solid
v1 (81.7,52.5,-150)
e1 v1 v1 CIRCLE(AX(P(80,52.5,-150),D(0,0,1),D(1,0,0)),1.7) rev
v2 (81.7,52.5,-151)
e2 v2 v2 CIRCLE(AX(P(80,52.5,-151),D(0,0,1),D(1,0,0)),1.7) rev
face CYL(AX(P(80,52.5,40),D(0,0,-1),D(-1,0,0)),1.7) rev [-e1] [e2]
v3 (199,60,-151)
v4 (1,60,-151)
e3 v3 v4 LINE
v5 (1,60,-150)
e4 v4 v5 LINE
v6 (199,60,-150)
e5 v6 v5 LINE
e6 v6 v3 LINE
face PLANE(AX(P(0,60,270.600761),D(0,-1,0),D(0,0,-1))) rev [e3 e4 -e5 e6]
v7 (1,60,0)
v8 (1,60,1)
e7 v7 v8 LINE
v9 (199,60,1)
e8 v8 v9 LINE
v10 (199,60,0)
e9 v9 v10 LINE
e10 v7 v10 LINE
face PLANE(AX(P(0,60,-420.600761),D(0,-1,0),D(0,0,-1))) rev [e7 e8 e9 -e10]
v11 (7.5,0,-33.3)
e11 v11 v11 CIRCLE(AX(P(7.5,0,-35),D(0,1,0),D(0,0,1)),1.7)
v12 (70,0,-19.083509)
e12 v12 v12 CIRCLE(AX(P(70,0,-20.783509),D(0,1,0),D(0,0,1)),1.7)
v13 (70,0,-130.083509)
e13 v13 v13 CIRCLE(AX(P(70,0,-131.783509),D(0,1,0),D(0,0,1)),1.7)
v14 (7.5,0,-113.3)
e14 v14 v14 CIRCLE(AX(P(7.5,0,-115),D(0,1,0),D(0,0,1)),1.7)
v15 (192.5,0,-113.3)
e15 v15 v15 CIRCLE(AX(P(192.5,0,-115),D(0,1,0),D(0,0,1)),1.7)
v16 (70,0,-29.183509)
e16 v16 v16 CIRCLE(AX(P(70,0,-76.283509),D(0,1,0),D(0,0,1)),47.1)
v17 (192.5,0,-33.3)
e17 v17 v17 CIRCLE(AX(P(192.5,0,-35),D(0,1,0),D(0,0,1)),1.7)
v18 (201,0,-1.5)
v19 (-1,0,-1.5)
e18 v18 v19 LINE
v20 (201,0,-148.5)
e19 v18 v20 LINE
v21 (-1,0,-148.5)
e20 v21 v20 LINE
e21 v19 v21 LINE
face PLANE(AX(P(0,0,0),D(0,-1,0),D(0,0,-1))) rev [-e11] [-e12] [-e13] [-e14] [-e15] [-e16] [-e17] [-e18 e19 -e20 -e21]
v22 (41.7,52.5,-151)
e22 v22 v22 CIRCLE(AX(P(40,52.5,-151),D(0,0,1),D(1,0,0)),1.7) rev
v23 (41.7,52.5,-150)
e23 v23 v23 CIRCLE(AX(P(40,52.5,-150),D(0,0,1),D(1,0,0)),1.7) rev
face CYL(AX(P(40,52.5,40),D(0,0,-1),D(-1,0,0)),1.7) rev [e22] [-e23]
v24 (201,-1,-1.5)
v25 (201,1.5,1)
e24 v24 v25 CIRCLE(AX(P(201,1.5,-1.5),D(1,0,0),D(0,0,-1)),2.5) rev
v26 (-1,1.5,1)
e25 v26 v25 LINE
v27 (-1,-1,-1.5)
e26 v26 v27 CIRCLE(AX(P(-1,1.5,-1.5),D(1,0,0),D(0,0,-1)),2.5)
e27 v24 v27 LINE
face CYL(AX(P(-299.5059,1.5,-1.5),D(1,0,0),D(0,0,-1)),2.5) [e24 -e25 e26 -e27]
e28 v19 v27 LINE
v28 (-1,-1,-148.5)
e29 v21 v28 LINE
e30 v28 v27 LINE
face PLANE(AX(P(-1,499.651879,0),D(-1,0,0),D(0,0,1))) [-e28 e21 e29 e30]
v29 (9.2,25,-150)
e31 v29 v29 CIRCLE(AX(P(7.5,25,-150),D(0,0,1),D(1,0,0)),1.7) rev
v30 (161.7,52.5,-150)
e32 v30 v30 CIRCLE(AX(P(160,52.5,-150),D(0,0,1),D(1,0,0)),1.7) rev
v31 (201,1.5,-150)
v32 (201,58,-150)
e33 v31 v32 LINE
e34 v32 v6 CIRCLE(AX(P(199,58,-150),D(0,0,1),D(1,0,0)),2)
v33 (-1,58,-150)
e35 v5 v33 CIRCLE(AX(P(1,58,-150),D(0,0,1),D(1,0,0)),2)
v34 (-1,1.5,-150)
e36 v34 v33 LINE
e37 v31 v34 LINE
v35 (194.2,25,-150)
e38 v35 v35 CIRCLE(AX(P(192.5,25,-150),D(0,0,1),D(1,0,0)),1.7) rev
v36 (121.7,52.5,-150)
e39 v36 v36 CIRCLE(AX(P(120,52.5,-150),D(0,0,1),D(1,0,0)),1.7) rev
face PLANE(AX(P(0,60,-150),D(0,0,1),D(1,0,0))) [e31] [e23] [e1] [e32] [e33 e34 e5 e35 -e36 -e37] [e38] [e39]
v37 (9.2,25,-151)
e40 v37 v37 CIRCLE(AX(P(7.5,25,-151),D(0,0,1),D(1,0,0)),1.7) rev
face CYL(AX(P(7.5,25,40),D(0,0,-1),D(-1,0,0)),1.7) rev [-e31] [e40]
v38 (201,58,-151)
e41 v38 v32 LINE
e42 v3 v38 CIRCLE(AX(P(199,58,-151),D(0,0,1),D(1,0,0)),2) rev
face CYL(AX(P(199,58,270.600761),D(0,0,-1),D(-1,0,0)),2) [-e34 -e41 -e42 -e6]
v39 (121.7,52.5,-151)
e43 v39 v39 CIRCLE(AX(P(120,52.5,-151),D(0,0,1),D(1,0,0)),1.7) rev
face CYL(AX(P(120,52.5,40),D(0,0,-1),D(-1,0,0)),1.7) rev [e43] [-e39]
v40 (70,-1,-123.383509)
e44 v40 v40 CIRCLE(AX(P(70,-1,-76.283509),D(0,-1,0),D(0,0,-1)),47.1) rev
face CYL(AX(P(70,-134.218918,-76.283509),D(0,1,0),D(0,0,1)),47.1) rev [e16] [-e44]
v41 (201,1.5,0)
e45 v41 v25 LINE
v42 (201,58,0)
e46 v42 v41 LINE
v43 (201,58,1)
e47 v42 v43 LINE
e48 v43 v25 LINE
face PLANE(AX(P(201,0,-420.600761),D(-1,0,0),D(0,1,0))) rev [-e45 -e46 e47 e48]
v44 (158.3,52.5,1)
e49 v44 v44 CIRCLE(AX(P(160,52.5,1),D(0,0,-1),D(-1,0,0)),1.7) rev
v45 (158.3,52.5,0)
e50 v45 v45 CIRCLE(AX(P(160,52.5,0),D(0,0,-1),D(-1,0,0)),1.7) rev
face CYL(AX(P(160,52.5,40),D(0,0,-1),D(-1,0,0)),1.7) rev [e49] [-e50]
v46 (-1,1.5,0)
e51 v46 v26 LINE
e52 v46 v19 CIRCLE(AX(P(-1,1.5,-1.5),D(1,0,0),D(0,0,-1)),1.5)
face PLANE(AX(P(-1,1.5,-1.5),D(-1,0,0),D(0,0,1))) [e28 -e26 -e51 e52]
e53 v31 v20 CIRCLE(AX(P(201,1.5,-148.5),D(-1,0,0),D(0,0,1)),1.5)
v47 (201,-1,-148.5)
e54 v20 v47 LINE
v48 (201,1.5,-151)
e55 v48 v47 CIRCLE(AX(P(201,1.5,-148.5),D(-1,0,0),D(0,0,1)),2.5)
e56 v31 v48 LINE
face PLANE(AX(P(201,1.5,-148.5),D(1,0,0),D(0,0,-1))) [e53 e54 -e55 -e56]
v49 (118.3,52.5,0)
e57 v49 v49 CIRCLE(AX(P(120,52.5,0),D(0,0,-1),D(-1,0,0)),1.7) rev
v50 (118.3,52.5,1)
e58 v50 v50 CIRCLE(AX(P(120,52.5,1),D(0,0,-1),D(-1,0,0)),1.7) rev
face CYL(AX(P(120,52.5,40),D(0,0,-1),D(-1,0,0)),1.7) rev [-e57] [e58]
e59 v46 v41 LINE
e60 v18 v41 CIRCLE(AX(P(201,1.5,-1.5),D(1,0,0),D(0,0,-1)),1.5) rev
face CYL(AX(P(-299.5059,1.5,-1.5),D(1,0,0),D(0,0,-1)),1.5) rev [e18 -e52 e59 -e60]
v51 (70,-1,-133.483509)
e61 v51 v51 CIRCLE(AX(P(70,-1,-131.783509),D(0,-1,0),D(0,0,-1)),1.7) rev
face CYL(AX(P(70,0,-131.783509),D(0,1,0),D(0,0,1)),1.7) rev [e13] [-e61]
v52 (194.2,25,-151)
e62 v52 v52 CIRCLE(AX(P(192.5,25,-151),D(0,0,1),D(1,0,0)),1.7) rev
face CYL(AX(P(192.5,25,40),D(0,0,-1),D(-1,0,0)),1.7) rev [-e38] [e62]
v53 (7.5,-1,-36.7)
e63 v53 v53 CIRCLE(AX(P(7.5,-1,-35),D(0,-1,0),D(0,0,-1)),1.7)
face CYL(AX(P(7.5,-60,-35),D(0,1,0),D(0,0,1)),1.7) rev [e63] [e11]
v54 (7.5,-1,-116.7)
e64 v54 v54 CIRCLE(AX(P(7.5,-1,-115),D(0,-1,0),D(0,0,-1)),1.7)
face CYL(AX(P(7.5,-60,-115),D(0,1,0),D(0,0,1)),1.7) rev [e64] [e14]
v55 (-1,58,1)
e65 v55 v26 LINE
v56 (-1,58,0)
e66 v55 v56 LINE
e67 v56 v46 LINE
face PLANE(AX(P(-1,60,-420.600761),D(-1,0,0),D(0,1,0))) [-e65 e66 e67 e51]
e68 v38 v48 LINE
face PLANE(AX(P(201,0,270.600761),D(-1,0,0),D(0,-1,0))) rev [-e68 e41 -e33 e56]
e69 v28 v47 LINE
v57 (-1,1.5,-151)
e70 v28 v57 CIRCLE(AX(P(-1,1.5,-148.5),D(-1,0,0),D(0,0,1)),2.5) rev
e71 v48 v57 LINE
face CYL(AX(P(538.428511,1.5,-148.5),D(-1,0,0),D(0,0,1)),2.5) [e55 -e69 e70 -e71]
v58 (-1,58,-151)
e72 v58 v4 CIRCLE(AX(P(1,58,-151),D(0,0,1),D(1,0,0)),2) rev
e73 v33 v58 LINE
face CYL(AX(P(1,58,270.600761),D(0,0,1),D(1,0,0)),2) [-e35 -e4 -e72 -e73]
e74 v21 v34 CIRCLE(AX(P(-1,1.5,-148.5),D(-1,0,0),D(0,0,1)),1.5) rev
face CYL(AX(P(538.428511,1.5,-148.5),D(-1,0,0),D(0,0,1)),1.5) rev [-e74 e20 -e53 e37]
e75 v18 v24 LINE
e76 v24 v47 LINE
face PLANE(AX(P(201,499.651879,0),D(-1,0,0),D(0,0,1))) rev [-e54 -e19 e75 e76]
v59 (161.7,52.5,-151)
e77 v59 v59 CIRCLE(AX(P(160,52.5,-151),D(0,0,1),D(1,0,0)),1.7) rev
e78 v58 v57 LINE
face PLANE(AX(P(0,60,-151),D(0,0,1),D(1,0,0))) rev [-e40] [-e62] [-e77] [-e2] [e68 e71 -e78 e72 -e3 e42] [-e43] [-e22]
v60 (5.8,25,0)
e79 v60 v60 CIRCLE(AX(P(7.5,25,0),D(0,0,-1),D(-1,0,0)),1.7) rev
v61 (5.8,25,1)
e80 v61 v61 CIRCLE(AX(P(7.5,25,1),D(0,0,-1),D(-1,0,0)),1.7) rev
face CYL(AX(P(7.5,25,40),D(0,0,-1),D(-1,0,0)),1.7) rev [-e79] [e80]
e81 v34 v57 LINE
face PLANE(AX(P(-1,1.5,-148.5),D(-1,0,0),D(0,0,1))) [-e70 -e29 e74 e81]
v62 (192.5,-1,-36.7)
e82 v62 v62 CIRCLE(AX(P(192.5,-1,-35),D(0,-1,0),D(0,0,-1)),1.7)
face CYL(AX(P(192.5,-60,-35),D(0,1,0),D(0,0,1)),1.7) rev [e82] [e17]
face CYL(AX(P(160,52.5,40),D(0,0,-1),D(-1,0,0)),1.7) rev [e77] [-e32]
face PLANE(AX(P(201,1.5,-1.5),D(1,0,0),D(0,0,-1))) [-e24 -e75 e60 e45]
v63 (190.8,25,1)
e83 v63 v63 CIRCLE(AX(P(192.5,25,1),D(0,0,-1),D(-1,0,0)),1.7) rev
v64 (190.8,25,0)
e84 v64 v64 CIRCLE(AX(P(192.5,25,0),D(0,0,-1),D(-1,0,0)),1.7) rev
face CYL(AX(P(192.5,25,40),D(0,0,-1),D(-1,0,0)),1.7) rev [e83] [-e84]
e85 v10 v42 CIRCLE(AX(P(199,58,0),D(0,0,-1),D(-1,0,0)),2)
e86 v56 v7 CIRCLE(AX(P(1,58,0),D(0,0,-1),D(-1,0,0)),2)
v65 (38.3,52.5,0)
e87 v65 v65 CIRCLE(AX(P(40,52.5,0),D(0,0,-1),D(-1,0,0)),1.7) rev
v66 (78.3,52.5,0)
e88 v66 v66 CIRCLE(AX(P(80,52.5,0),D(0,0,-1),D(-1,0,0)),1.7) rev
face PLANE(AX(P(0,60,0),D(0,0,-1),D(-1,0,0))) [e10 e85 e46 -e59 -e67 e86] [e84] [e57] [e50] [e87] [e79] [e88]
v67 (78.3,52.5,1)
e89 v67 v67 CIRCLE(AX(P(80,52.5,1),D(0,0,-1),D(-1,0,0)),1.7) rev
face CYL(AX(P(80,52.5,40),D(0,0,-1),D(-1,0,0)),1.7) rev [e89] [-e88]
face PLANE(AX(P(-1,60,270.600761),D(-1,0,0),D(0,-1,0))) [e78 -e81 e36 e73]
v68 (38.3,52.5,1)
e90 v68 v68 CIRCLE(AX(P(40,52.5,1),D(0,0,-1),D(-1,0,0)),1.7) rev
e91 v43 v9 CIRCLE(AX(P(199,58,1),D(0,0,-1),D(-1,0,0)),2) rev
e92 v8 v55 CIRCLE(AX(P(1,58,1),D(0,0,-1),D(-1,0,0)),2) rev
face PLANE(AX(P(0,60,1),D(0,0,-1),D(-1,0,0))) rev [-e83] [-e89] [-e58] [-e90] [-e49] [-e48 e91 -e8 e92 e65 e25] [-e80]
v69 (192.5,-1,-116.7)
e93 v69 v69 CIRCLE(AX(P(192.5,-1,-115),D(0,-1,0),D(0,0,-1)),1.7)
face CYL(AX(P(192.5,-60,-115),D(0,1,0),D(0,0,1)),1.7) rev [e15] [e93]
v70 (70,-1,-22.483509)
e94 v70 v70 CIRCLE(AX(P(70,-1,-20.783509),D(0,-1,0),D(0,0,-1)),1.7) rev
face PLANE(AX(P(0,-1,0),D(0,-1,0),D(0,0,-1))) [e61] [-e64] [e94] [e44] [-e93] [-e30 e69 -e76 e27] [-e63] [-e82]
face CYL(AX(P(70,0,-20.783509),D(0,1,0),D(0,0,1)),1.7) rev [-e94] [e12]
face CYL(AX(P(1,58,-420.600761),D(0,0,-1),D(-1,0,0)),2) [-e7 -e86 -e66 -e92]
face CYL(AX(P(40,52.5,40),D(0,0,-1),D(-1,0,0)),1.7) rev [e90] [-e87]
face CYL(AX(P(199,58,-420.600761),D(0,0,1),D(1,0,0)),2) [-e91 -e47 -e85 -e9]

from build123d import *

# Parameters (mm, degrees)
CROQUIS1_W                      = 200
CROQUIS1_H                      = 150
SALIENTE_EXTRUIR1_DEPTH         = 60
VACIADO1_T                      = 1
CROQUIS3_R                      = 1.7
CORTAR_EXTRUIR2_DEPTH           = 60
CORTAR_EXTRUIR3_DEPTH           = 190
CORTAR_EXTRUIR3_DEPTH_BACK      = 104
CROQUIS4_R                      = 1.7
CORTAR_EXTRUIR4_DEPTH           = 1
TALADRO_DE_MARGEN_PARA_M31_D    = 3.4
CROQUIS14_W                     = 150
CROQUIS14_H                     = 60
CORTAR_EXTRUIR5_DEPTH           = 210
DESPLEGAR_PLIEGUES2_OUTLINE_W   = 202
DESPLEGAR_PLIEGUES2_OUTLINE_H   = 1
DESPLEGAR_PLIEGUES2_DEPTH       = 60
DESPLEGAR_START                 = -1
DESPLEGAR_PLIEGUES2_2_OUTLINE_W = 202
DESPLEGAR_PLIEGUES2_2_OUTLINE_H = 59.141592654
DESPLEGAR_PLIEGUES2_2_OUTLINE_R = 1.7
DESPLEGAR_PLIEGUES2_2_DEPTH     = 1
PROCESAR_START                  = -210.141592654
PROCESAR_PLIEGUES2_OUTLINE_W    = 202
PROCESAR_PLIEGUES2_OUTLINE_H    = 1
PROCESAR_PLIEGUES2_DEPTH        = 59.398442654
PROCESAR_START_2                = 0.74315
PROCESAR_PLIEGUES2_2_OUTLINE_W  = 202
PROCESAR_PLIEGUES2_2_OUTLINE_H  = 1
PROCESAR_PLIEGUES2_2_DEPTH      = 59.398442654
PROCESAR_START_3                = -151
PROCESAR_PLIEGUES2_3_OUTLINE_W  = 202
PROCESAR_PLIEGUES2_3_OUTLINE_H  = 60
PROCESAR_PLIEGUES2_3_OUTLINE_R  = 1.7
PROCESAR_PLIEGUES2_3_DEPTH      = 2.5
PROCESAR_START_4                = -1.5
PROCESAR_PLIEGUES2_4_OUTLINE_W  = 202
PROCESAR_PLIEGUES2_4_OUTLINE_H  = 60
PROCESAR_PLIEGUES2_4_OUTLINE_R  = 1.7
PROCESAR_PLIEGUES2_4_DEPTH      = 2.5
PROCESAR_START_5                = -1
PROCESAR_PLIEGUES2_5_DEPTH      = 202
REDONDEO1_R                     = 2


with BuildPart() as part:
    # Croquis1 → Saliente-Extruir1 (new body)
    with BuildSketch(Plane(origin=(0, 0, 0), x_dir=(1, 0, 0), z_dir=(0, 1, 0))):
        with Locations((100, 75)):
            Rectangle(CROQUIS1_W, CROQUIS1_H)
    extrude(amount=SALIENTE_EXTRUIR1_DEPTH)

    # Vaciado1
    vaciado1_openings = [part.faces().sort_by_distance(p)[0] for p in [
        (100, 60, -75),
    ]]
    offset(amount=VACIADO1_T, openings=vaciado1_openings, kind=Kind.INTERSECTION)

    # Croquis3 → Cortar-Extruir2 (cut)
    with BuildSketch(Plane(origin=(0, 0, 0), x_dir=(-1, 0, 0), z_dir=(0, 1, 0))):
        with Locations(Location((-192.5, -35, 0), (0, 0, 90))):
            Circle(CROQUIS3_R)
        with Locations(Location((-192.5, -115, 0), (0, 0, 90))):
            Circle(CROQUIS3_R)
        with Locations(Location((-7.5, -35, 0), (0, 0, 90))):
            Circle(CROQUIS3_R)
        with Locations(Location((-7.5, -115, 0), (0, 0, 90))):
            Circle(CROQUIS3_R)
    extrude(amount=-CORTAR_EXTRUIR2_DEPTH, mode=Mode.SUBTRACT)

    # Croquis4 → Cortar-Extruir3 (cut, two sides: drawn at the far end of the back side and taken through both)
    with BuildSketch(Plane.XY.offset(-150).offset(-CORTAR_EXTRUIR3_DEPTH_BACK)):
        with Locations((192.5, 25)):
            Circle(CROQUIS4_R)
        with Locations((160, 52.5)):
            Circle(CROQUIS4_R)
        with Locations((120, 52.5)):
            Circle(CROQUIS4_R)
        with Locations((80, 52.5)):
            Circle(CROQUIS4_R)
        with Locations((40, 52.5)):
            Circle(CROQUIS4_R)
        with Locations((7.5, 25)):
            Circle(CROQUIS4_R)
    extrude(amount=CORTAR_EXTRUIR3_DEPTH + CORTAR_EXTRUIR3_DEPTH_BACK, mode=Mode.SUBTRACT)

    # Croquis5 → Cortar-Extruir4 (cut)
    with BuildSketch(Plane(origin=(0, 0, 0), x_dir=(1, 0, 0), z_dir=(0, 1, 0))):
        with BuildLine():
            ThreePointArc((117.1, 76.283509089), (103.304729394, 109.588238483), (70, 123.383509089))
            Line((70, 123.383509089), (70, 29.183509089))
            ThreePointArc((70, 29.183509089), (103.304729394, 42.978779695), (117.1, 76.283509089))
        make_face()
        with BuildLine():
            Line((70, 29.183509089), (70, 123.383509089))
            ThreePointArc((70, 123.383509089), (22.9, 76.283509089), (70, 29.183509089))
        make_face()
    extrude(amount=-CORTAR_EXTRUIR4_DEPTH, mode=Mode.SUBTRACT)

    # Taladro de margen para M31 (through all)
    with Locations(Plane(origin=(0, 0, 0), x_dir=(1, 0, 0), z_dir=(0, 1, 0))):
        with Locations((70, 20.783509089), (70, 131.783509089)):
            Hole(TALADRO_DE_MARGEN_PARA_M31_D / 2)

    # Croquis14 → Cortar-Extruir5 (cut)
    with BuildSketch(Plane(origin=(201, 0, 0), x_dir=(0, 0, -1), z_dir=(1, 0, 0))):
        with Locations((75, 30)):
            Rectangle(CROQUIS14_W, CROQUIS14_H)
    extrude(amount=-CORTAR_EXTRUIR5_DEPTH, mode=Mode.SUBTRACT)

    # Desplegar pliegues2: read off the stored shape, not the designer's step
    # Desplegar pliegues2 outline → Desplegar pliegues2 (cut)
    with BuildSketch(Plane(origin=(0, 0, 0), x_dir=(1, 0, 0), z_dir=(0, 1, 0))):
        with Locations((100, 150.5)):
            Rectangle(DESPLEGAR_PLIEGUES2_OUTLINE_W, DESPLEGAR_PLIEGUES2_OUTLINE_H)
        with Locations((100, -0.5)):
            Rectangle(DESPLEGAR_PLIEGUES2_OUTLINE_W, DESPLEGAR_PLIEGUES2_OUTLINE_H)
    extrude(amount=DESPLEGAR_PLIEGUES2_DEPTH, mode=Mode.SUBTRACT)

    # Desplegar pliegues2 2 outline → Desplegar pliegues2 2 (add)
    # profile 1 of 2: a face of its own
    with BuildSketch(Plane(origin=(0, 0, 0), x_dir=(1, 0, 0), z_dir=(0, 1, 0)).offset(DESPLEGAR_START)):
        with Locations((100, 180.570796327)):
            Rectangle(DESPLEGAR_PLIEGUES2_2_OUTLINE_W, DESPLEGAR_PLIEGUES2_2_OUTLINE_H)
        with Locations((7.5, 175.141592654)):
            Circle(DESPLEGAR_PLIEGUES2_2_OUTLINE_R, mode=Mode.SUBTRACT)
        with Locations((40, 202.641592654)):
            Circle(DESPLEGAR_PLIEGUES2_2_OUTLINE_R, mode=Mode.SUBTRACT)
        with Locations((80, 202.641592654)):
            Circle(DESPLEGAR_PLIEGUES2_2_OUTLINE_R, mode=Mode.SUBTRACT)
        with Locations((120, 202.641592654)):
            Circle(DESPLEGAR_PLIEGUES2_2_OUTLINE_R, mode=Mode.SUBTRACT)
        with Locations((192.5, 175.141592654)):
            Circle(DESPLEGAR_PLIEGUES2_2_OUTLINE_R, mode=Mode.SUBTRACT)
        with Locations((160, 202.641592654)):
            Circle(DESPLEGAR_PLIEGUES2_2_OUTLINE_R, mode=Mode.SUBTRACT)
    # profile 2 of 2: a face of its own
    with BuildSketch(Plane(origin=(0, 0, 0), x_dir=(1, 0, 0), z_dir=(0, 1, 0)).offset(DESPLEGAR_START)):
        with Locations((100, -30.570796327)):
            Rectangle(DESPLEGAR_PLIEGUES2_2_OUTLINE_W, DESPLEGAR_PLIEGUES2_2_OUTLINE_H)
        with Locations((40, -52.641592654)):
            Circle(DESPLEGAR_PLIEGUES2_2_OUTLINE_R, mode=Mode.SUBTRACT)
        with Locations((7.5, -25.141592654)):
            Circle(DESPLEGAR_PLIEGUES2_2_OUTLINE_R, mode=Mode.SUBTRACT)
        with Locations((80, -52.641592654)):
            Circle(DESPLEGAR_PLIEGUES2_2_OUTLINE_R, mode=Mode.SUBTRACT)
        with Locations((120, -52.641592654)):
            Circle(DESPLEGAR_PLIEGUES2_2_OUTLINE_R, mode=Mode.SUBTRACT)
        with Locations((160, -52.641592654)):
            Circle(DESPLEGAR_PLIEGUES2_2_OUTLINE_R, mode=Mode.SUBTRACT)
        with Locations((192.5, -25.141592654)):
            Circle(DESPLEGAR_PLIEGUES2_2_OUTLINE_R, mode=Mode.SUBTRACT)
    extrude(amount=DESPLEGAR_PLIEGUES2_2_DEPTH)

    # Procesar pliegues2: read off the stored shape, not the designer's step
    # Procesar pliegues2 outline → Procesar pliegues2 (cut)
    with BuildSketch(Plane.XY.offset(PROCESAR_START)):
        with Locations((100, -0.5)):
            Rectangle(PROCESAR_PLIEGUES2_OUTLINE_W, PROCESAR_PLIEGUES2_OUTLINE_H)
    extrude(amount=PROCESAR_PLIEGUES2_DEPTH, mode=Mode.SUBTRACT)

    # Procesar pliegues2 2 outline → Procesar pliegues2 2 (cut)
    with BuildSketch(Plane.XY.offset(PROCESAR_START_2)):
        with Locations((100, -0.5)):
            Rectangle(PROCESAR_PLIEGUES2_2_OUTLINE_W, PROCESAR_PLIEGUES2_2_OUTLINE_H)
    extrude(amount=PROCESAR_PLIEGUES2_2_DEPTH, mode=Mode.SUBTRACT)

    # Procesar pliegues2 3 outline → Procesar pliegues2 3 (add)
    with BuildSketch(Plane.XY.offset(PROCESAR_START_3)):
        with Locations((100, 30)):
            Rectangle(PROCESAR_PLIEGUES2_3_OUTLINE_W, PROCESAR_PLIEGUES2_3_OUTLINE_H)
        with Locations((7.5, 25)):
            Circle(PROCESAR_PLIEGUES2_3_OUTLINE_R, mode=Mode.SUBTRACT)
        with Locations((192.5, 25)):
            Circle(PROCESAR_PLIEGUES2_3_OUTLINE_R, mode=Mode.SUBTRACT)
        with Locations((40, 52.5)):
            Circle(PROCESAR_PLIEGUES2_3_OUTLINE_R, mode=Mode.SUBTRACT)
        with Locations((80, 52.5)):
            Circle(PROCESAR_PLIEGUES2_3_OUTLINE_R, mode=Mode.SUBTRACT)
        with Locations((120, 52.5)):
            Circle(PROCESAR_PLIEGUES2_3_OUTLINE_R, mode=Mode.SUBTRACT)
        with Locations((160, 52.5)):
            Circle(PROCESAR_PLIEGUES2_3_OUTLINE_R, mode=Mode.SUBTRACT)
    extrude(amount=PROCESAR_PLIEGUES2_3_DEPTH)

    # Procesar pliegues2 4 outline → Procesar pliegues2 4 (add)
    with BuildSketch(Plane.XY.offset(PROCESAR_START_4)):
        with Locations((100, 30)):
            Rectangle(PROCESAR_PLIEGUES2_4_OUTLINE_W, PROCESAR_PLIEGUES2_4_OUTLINE_H)
        with Locations((7.5, 25)):
            Circle(PROCESAR_PLIEGUES2_4_OUTLINE_R, mode=Mode.SUBTRACT)
        with Locations((192.5, 25)):
            Circle(PROCESAR_PLIEGUES2_4_OUTLINE_R, mode=Mode.SUBTRACT)
        with Locations((40, 52.5)):
            Circle(PROCESAR_PLIEGUES2_4_OUTLINE_R, mode=Mode.SUBTRACT)
        with Locations((80, 52.5)):
            Circle(PROCESAR_PLIEGUES2_4_OUTLINE_R, mode=Mode.SUBTRACT)
        with Locations((120, 52.5)):
            Circle(PROCESAR_PLIEGUES2_4_OUTLINE_R, mode=Mode.SUBTRACT)
        with Locations((160, 52.5)):
            Circle(PROCESAR_PLIEGUES2_4_OUTLINE_R, mode=Mode.SUBTRACT)
    extrude(amount=PROCESAR_PLIEGUES2_4_DEPTH)

    # Procesar pliegues2 5 outline → Procesar pliegues2 5 (cut)
    with BuildSketch(Plane.YZ.offset(PROCESAR_START_5)):
        with BuildLine():
            Line((1.5, -150), (60, -150))
            Line((60, -150), (60, -148.5))
            Line((60, -148.5), (0, -148.5))
            ThreePointArc((0, -148.5), (0.439339828, -149.560660172), (1.5, -150))
        make_face()
        with BuildLine():
            ThreePointArc((1.5, -151), (-0.267766953, -150.267766953), (-1, -148.5))
            Line((-1, -148.5), (-1, -150.74315))
            Line((-1, -150.74315), (0, -150.74315))
            Line((0, -150.74315), (0, -151))
            Line((0, -151), (1.5, -151))
        make_face()
        with BuildLine():
            ThreePointArc((-1, -1.5), (-0.267766953, 0.267766953), (1.5, 1))
            Line((1.5, 1), (0, 1))
            Line((0, 1), (0, 0.74315))
            Line((0, 0.74315), (-1, 0.74315))
            Line((-1, 0.74315), (-1, -1.5))
        make_face()
        with BuildLine():
            Line((60, 0), (1.5, 0))
            ThreePointArc((1.5, 0), (0.439339828, -0.439339828), (0, -1.5))
            Line((0, -1.5), (60, -1.5))
            Line((60, -1.5), (60, 0))
        make_face()
    extrude(amount=PROCESAR_PLIEGUES2_5_DEPTH, mode=Mode.SUBTRACT)

    # Redondeo1
    redondeo1_edges = [part.edges().sort_by_distance(p)[0] for p in [
        (201, 60, -150.5),
        (-1, 60, -150.5),
        (-1, 60, 0.5),
        (201, 60, 0.5),
    ]]
    fillet(redondeo1_edges, radius=REDONDEO1_R)


solid = part.part
